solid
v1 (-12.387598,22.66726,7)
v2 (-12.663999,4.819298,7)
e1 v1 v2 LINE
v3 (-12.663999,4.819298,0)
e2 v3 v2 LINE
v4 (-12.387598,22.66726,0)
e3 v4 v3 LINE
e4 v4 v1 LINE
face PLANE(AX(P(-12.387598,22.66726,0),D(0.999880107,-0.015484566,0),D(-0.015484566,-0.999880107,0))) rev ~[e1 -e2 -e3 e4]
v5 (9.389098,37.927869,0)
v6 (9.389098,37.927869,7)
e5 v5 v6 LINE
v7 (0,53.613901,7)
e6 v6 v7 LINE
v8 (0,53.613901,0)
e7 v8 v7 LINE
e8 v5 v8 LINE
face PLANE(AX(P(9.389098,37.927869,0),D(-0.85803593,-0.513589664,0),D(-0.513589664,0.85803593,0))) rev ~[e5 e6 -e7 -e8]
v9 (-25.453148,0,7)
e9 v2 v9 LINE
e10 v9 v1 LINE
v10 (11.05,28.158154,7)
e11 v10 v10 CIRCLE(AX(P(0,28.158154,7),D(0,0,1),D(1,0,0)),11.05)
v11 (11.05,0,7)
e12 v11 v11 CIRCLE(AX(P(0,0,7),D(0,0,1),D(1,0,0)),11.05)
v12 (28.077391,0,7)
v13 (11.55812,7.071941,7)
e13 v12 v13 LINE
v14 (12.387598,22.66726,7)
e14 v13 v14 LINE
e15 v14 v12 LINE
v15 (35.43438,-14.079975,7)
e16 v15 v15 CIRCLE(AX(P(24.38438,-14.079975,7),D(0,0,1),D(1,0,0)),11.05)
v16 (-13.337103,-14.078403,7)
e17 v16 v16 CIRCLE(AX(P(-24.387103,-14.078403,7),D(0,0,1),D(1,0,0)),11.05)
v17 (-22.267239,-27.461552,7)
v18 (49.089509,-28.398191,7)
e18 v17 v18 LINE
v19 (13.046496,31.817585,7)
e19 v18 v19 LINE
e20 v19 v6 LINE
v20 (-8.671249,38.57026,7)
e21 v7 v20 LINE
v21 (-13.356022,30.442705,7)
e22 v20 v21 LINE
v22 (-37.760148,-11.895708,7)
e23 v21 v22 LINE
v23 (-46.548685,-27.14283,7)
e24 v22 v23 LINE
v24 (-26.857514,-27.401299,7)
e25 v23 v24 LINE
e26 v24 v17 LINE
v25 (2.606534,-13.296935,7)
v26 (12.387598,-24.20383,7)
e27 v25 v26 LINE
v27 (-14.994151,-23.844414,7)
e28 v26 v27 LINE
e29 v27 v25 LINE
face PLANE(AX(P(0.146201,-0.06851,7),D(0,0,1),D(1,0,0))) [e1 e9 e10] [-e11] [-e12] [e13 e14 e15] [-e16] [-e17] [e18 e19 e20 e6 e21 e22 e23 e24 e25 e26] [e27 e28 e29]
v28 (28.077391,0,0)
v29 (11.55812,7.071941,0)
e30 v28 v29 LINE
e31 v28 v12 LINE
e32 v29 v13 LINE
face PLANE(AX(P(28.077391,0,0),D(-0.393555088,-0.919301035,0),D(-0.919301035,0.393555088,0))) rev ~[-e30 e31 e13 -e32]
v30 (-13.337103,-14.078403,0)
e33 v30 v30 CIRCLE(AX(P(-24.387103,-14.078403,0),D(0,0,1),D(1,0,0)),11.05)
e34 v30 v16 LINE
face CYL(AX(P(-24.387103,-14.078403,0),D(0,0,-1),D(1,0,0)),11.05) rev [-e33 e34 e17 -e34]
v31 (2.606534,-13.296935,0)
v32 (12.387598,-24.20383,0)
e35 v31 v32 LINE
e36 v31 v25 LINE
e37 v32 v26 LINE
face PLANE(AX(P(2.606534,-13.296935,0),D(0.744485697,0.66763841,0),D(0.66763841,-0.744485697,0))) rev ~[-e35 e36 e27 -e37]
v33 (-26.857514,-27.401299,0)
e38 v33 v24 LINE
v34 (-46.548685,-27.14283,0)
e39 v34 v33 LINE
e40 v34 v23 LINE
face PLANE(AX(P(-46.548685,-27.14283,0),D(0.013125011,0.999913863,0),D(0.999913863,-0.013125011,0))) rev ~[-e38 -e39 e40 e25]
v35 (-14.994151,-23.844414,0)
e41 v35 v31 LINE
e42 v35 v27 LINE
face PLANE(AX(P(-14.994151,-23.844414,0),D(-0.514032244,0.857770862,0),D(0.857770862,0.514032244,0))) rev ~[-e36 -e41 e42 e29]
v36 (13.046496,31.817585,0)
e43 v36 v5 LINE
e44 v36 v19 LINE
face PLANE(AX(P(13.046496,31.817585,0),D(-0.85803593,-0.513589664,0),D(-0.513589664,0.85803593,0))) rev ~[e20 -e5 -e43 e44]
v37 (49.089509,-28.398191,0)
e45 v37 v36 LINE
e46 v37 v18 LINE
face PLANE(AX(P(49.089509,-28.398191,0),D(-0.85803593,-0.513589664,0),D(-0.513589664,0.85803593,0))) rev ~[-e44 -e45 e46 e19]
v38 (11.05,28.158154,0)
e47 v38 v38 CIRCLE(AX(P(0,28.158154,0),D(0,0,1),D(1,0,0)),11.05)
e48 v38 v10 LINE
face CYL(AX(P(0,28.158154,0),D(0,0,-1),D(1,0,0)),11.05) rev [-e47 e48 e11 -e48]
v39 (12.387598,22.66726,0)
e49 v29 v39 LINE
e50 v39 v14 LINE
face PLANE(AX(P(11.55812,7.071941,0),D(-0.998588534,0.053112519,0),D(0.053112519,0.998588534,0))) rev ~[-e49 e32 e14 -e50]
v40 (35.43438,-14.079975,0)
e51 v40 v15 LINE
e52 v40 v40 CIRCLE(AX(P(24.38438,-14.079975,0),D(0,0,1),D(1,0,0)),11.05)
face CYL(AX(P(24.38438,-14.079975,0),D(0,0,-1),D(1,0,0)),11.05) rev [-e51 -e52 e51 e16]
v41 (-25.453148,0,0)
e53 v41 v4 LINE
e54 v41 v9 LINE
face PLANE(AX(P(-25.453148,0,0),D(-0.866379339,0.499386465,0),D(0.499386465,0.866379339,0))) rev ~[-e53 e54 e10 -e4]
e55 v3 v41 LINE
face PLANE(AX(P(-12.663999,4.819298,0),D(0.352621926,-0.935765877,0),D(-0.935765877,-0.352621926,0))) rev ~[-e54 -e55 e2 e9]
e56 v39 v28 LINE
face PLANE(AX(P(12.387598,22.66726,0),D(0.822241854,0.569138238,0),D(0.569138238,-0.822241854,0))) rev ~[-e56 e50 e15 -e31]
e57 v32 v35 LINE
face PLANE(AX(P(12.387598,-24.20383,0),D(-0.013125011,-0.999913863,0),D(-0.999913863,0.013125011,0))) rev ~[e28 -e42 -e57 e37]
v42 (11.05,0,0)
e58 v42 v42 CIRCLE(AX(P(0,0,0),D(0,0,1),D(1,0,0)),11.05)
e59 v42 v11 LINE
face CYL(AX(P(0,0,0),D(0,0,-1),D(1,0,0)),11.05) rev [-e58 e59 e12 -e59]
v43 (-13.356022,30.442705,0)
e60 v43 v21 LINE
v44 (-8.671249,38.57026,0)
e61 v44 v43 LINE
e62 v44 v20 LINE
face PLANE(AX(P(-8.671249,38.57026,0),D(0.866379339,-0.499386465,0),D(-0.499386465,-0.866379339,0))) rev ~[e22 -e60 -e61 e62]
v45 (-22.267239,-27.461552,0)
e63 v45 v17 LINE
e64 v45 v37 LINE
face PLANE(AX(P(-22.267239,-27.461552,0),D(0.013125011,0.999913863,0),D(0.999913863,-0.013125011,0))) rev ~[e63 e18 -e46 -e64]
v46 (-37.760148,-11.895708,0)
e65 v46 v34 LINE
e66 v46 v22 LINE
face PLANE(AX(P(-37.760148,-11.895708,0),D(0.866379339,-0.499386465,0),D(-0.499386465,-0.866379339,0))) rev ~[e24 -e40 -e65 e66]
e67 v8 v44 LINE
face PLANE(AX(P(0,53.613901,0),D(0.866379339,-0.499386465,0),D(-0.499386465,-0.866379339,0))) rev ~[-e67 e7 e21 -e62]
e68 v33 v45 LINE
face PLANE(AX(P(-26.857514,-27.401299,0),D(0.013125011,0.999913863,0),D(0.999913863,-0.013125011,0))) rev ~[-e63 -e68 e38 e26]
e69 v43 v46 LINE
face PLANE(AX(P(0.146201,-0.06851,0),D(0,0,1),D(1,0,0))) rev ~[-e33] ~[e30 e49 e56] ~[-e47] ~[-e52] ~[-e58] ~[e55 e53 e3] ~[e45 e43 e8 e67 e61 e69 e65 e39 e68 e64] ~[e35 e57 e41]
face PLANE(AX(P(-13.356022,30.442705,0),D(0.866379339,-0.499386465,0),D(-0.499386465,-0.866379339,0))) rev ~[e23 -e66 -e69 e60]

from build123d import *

# Parameters (mm, degrees)
F0_R     = 11.05
F0_R_2   = 13.55
F1_DEPTH = 7


with BuildPart() as f1:
    # F0 (on Top) → F1 (new body)
    with BuildSketch(Plane.XY):
        with BuildLine():
            ThreePointArc((2.6065338711, -13.2969350295), (10.4623380263, -8.6105739079), (13.55, 0))
            ThreePointArc((13.55, 0), (13.0425271945, 3.6735520114), (11.5581203867, 7.0719412559))
            ThreePointArc((11.5581203867, 7.0719412559), (-1.2547280417, 13.4917811108), (-12.6639989198, 4.8192978077))
            ThreePointArc((-12.6639989198, 4.8192978077), (-10.3603872444, -8.7329763624), (2.6065338711, -13.2969350295))
        make_face()
        Circle(F0_R, mode=Mode.SUBTRACT)
        with BuildLine():
            ThreePointArc((11.5581203867, 7.0719412559), (13.0425271945, 3.6735520114), (13.55, 0))
            ThreePointArc((13.55, 0), (10.4623380263, -8.6105739079), (2.6065338711, -13.2969350295))
            Line((2.6065338711, -13.2969350295), (12.3875978298, -24.2038302976))
            Line((12.3875978298, -24.2038302976), (-14.9941514566, -23.8444135863))
            ThreePointArc((-14.9941514566, -23.8444135863), (-18.3532690256, -26.2108119603), (-22.267239092, -27.461551912))
            Line((-22.267239092, -27.461551912), (49.0895092572, -28.3981906763))
            Line((49.0895092572, -28.3981906763), (13.0464962981, 31.8175852156))
            ThreePointArc((13.0464962981, 31.8175852156), (13.4235339021, 30.0051079331), (13.55, 28.1581543386))
            ThreePointArc((13.55, 28.1581543386), (13.2562145915, 25.351862354), (12.3875978298, 22.6672600574))
            Line((12.3875978298, 22.6672600574), (28.0773907901, 0))
            Line((28.0773907901, 0), (11.5581203867, 7.0719412559))
        make_face()
        with Locations((24.3843801233, -14.0799748264)):
            Circle(F0_R_2, mode=Mode.SUBTRACT)
        with BuildLine():
            ThreePointArc((-12.6639989198, 4.8192978077), (-1.2547280417, 13.4917811108), (11.5581203867, 7.0719412559))
            Line((11.5581203867, 7.0719412559), (12.3875978298, 22.6672600574))
            ThreePointArc((12.3875978298, 22.6672600574), (0, 14.6081543386), (-12.3875978298, 22.6672600574))
            Line((-12.3875978298, 22.6672600574), (-12.6639989198, 4.8192978077))
        make_face()
        with BuildLine():
            Line((-14.9941514566, -23.8444135863), (2.6065338711, -13.2969350295))
            ThreePointArc((2.6065338711, -13.2969350295), (-10.3603872444, -8.7329763624), (-12.6639989198, 4.8192978077))
            Line((-12.6639989198, 4.8192978077), (-25.4531481717, 0))
            Line((-25.4531481717, 0), (-12.3875978298, 22.6672600574))
            ThreePointArc((-12.3875978298, 22.6672600574), (-13.4461101823, 26.4834540771), (-13.3560221409, 30.4427051857))
            Line((-13.3560221409, 30.4427051857), (-32.9787461707, -3.600513583))
            ThreePointArc((-32.9787461707, -3.600513583), (-18.5911674875, -1.8305608799), (-10.8371028035, -14.0784028862))
            ThreePointArc((-10.8371028035, -14.0784028862), (-11.9196052449, -19.3853798623), (-14.9941514566, -23.8444135863))
        make_face()
        with BuildLine():
            ThreePointArc((-12.3875978298, 22.6672600574), (0, 14.6081543386), (12.3875978298, 22.6672600574))
            ThreePointArc((12.3875978298, 22.6672600574), (13.2562145915, 25.351862354), (13.55, 28.1581543386))
            ThreePointArc((13.55, 28.1581543386), (13.4235339021, 30.0051079331), (13.0464962981, 31.8175852156))
            Line((13.0464962981, 31.8175852156), (9.3890984881, 37.9278692567))
            ThreePointArc((9.3890984881, 37.9278692567), (0.4816570964, 41.6995909847), (-8.6712487219, 38.5702600624))
            Line((-8.6712487219, 38.5702600624), (-13.3560221409, 30.4427051857))
            ThreePointArc((-13.3560221409, 30.4427051857), (-13.4461101823, 26.4834540771), (-12.3875978298, 22.6672600574))
        make_face()
        with Locations((0, 28.1581543386)):
            Circle(F0_R, mode=Mode.SUBTRACT)
        with BuildLine():
            ThreePointArc((-22.267239092, -27.461551912), (-18.3532690256, -26.2108119603), (-14.9941514566, -23.8444135863))
            ThreePointArc((-14.9941514566, -23.8444135863), (-11.9196052449, -19.3853798623), (-10.8371028035, -14.0784028862))
            ThreePointArc((-10.8371028035, -14.0784028862), (-18.5911674875, -1.8305608799), (-32.9787461707, -3.600513583))
            Line((-32.9787461707, -3.600513583), (-37.7601482446, -11.895708306))
            ThreePointArc((-37.7601482446, -11.895708306), (-35.4713085242, -21.872174986), (-26.8575138424, -27.4012993168))
            Line((-26.8575138424, -27.4012993168), (-22.267239092, -27.461551912))
        make_face()
        with Locations((-24.3871028035, -14.0784028862)):
            Circle(F0_R, mode=Mode.SUBTRACT)
        with BuildLine():
            Line((-46.5486845968, -27.1428302263), (-26.8575138424, -27.4012993168))
            ThreePointArc((-26.8575138424, -27.4012993168), (-35.4713085242, -21.872174986), (-37.7601482446, -11.895708306))
            Line((-37.7601482446, -11.895708306), (-46.5486845968, -27.1428302263))
        make_face()
        with BuildLine():
            Line((0, 53.6139011383), (-8.6712487219, 38.5702600624))
            ThreePointArc((-8.6712487219, 38.5702600624), (0.4816570964, 41.6995909847), (9.3890984881, 37.9278692567))
            Line((9.3890984881, 37.9278692567), (0, 53.6139011383))
        make_face()
        with Locations((24.3843801233, -14.0799748264)):
            Circle(F0_R_2)
        with Locations((24.3843801233, -14.0799748264)):
            Circle(F0_R, mode=Mode.SUBTRACT)
    extrude(amount=F1_DEPTH)


solid = f1.part
